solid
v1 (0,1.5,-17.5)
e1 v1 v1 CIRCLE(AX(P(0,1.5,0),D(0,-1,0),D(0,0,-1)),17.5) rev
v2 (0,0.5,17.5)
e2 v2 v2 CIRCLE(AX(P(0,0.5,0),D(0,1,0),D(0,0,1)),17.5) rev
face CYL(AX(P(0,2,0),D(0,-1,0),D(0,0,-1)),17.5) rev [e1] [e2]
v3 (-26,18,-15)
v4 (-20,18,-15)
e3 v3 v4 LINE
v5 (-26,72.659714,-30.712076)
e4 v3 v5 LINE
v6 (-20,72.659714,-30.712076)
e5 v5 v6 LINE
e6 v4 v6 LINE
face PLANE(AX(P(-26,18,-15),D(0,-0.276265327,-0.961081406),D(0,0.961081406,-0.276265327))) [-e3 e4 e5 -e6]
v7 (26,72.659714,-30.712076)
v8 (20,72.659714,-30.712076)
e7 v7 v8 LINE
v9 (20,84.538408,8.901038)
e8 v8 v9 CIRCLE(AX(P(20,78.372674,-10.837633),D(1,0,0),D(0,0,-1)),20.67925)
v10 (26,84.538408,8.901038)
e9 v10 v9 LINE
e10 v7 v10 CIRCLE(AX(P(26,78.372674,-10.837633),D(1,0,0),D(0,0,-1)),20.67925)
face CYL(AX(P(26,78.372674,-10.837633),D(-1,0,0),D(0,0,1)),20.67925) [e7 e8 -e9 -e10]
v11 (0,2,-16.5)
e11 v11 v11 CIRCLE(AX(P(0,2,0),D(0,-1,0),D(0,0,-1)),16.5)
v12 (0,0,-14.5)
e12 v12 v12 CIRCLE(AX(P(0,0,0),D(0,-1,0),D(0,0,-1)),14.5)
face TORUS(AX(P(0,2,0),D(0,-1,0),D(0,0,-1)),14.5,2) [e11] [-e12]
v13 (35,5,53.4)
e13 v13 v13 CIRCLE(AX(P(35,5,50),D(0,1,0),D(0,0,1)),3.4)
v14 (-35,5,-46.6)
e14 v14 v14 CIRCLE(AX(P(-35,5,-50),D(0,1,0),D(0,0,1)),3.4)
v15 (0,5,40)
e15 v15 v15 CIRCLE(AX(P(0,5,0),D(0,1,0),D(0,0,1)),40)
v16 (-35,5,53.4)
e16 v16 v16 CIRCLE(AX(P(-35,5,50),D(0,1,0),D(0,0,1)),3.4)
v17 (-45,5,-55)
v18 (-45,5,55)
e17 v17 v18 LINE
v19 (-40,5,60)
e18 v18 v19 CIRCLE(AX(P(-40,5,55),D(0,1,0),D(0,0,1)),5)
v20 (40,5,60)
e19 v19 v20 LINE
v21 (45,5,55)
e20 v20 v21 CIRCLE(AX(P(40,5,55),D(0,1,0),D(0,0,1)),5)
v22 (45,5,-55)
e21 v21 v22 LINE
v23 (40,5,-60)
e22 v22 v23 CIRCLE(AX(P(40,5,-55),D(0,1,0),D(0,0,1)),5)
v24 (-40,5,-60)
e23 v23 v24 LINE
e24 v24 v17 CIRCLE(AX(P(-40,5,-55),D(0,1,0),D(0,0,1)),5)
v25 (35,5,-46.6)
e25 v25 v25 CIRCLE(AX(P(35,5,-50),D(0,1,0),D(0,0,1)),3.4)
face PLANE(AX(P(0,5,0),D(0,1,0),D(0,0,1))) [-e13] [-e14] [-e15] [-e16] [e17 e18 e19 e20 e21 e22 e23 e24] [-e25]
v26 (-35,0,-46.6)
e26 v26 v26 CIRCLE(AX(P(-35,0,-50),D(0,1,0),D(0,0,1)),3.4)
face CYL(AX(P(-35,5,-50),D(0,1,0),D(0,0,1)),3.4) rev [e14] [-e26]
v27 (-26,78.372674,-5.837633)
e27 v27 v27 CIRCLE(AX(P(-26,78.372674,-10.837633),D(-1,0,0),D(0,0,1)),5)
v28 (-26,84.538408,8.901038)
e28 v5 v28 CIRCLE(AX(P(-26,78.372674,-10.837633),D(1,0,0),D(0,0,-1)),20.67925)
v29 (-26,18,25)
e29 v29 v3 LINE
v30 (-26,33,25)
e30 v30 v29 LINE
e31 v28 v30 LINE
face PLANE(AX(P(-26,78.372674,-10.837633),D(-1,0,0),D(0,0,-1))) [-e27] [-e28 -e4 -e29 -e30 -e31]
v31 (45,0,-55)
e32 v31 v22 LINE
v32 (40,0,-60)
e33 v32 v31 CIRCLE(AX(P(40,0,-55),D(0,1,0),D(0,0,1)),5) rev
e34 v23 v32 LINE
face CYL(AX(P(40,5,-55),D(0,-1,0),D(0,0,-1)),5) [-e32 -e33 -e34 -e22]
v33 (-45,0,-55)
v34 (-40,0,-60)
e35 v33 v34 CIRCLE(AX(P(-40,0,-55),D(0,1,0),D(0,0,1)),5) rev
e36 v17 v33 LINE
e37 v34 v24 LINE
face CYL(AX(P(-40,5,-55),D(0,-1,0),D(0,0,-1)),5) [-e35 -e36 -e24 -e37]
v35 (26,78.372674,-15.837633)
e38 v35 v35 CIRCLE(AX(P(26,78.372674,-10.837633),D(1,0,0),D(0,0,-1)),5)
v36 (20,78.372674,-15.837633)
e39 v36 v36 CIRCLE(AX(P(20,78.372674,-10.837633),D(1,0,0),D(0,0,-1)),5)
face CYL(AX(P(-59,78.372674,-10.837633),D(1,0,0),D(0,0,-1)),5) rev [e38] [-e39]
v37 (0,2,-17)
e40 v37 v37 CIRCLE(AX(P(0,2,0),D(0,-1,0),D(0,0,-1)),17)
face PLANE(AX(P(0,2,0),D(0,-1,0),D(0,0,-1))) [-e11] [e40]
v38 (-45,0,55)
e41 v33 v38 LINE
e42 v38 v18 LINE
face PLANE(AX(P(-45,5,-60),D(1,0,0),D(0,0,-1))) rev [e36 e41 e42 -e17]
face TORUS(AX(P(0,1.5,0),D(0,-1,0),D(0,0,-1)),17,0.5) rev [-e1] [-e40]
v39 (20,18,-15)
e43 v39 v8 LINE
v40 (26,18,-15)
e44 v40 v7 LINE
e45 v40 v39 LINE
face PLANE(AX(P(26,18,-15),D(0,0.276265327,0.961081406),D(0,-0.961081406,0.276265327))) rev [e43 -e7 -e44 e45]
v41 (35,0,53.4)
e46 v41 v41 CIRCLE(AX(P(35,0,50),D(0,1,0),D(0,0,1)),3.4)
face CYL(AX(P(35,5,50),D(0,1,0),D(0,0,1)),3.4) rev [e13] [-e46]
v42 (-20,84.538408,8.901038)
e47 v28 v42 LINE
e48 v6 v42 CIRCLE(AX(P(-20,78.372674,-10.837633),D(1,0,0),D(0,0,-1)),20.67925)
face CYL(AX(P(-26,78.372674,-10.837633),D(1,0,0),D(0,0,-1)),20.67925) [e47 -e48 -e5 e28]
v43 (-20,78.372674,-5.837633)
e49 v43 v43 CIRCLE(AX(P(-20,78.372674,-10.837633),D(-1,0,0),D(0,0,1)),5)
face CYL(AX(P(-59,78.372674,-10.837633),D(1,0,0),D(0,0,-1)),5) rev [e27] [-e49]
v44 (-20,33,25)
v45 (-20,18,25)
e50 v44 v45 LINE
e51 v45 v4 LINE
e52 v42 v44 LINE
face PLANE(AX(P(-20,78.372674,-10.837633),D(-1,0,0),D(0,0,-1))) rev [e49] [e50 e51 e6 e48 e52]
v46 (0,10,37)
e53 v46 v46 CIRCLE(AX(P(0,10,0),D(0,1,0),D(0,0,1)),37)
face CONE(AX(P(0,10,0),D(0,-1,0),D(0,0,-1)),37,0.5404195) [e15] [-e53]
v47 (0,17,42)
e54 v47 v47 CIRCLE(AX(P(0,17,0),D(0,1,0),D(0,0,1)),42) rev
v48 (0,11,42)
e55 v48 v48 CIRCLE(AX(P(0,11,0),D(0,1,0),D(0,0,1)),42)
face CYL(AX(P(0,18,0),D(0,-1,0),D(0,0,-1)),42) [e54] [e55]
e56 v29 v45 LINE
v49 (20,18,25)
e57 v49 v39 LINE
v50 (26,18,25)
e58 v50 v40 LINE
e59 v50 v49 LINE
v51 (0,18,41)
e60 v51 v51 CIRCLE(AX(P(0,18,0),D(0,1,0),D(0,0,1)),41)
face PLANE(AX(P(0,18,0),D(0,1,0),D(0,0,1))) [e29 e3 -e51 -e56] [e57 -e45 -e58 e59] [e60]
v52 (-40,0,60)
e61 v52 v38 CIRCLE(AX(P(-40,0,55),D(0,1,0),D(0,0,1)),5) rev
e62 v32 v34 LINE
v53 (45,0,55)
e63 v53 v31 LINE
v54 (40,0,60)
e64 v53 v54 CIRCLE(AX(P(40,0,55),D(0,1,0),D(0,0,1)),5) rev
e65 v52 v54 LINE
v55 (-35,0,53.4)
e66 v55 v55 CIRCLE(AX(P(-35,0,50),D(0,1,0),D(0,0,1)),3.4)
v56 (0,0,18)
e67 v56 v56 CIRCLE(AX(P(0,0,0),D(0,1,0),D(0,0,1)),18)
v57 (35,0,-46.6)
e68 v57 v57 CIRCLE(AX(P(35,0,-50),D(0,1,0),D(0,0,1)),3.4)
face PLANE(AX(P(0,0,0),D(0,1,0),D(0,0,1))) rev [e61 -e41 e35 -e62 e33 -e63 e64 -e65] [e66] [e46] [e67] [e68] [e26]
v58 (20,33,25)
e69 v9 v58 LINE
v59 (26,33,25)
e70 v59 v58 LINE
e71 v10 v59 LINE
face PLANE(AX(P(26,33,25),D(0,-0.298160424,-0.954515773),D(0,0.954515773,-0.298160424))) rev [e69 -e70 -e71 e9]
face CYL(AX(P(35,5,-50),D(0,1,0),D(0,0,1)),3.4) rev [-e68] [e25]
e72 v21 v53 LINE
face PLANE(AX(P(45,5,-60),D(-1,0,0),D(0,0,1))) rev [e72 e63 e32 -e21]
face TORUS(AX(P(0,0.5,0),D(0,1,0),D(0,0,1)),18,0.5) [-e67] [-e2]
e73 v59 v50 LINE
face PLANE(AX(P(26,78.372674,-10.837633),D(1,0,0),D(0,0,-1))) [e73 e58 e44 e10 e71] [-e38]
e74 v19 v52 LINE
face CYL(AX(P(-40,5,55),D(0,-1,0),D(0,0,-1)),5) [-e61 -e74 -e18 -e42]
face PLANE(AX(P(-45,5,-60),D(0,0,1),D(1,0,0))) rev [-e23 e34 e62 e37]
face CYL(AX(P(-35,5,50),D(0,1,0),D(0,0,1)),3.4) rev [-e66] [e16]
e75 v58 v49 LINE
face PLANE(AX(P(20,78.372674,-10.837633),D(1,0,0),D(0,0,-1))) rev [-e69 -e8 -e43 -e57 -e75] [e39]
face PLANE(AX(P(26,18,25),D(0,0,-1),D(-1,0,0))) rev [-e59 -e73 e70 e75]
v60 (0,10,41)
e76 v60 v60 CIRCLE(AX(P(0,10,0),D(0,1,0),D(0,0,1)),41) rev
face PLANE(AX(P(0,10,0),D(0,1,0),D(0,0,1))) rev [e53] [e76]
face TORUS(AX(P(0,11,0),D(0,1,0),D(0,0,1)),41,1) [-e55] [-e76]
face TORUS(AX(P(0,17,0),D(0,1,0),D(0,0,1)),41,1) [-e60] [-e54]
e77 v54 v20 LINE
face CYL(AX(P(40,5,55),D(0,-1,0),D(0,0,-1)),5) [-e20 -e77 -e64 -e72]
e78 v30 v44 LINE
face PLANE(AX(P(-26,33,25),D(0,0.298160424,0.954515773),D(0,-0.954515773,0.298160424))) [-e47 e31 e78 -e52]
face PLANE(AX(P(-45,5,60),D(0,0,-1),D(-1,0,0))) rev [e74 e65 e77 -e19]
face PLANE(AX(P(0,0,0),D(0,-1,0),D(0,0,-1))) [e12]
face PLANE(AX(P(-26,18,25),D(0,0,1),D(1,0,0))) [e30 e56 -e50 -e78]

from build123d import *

# Parameters (mm, degrees)
SKETCH_1_W          = 90
SKETCH_1_H          = 120
EXTRUDE_1_DEPTH     = 5
FILLET_3_R          = 5
SKETCH_21_R         = 17.5
CUT_EXTRUDE_1_DEPTH = 2
FILLET_4_R          = 0.5
SKETCH_22_R         = 16.5
EXTRUDE_2_DEPTH     = 2
FILLET_5_R          = 2
FILLET_6_R          = 0.5
SKETCH_27_R         = 42
EXTRUDE_4_DEPTH     = 8
EXTRUDE_5_DEPTH     = 6
SKETCH_31_R         = 5
CUT_EXTRUDE_2_DEPTH = 85
FILLET_7_R          = 1
FILLET_8_R          = 1


with BuildPart() as part:
    # 草图1 → 凸台-拉伸1 (new body)
    with BuildSketch(Plane(origin=(0, 0, 0), x_dir=(1, 0, 0), z_dir=(0, 1, 0))):
        Rectangle(SKETCH_1_W, SKETCH_1_H)
    extrude(amount=EXTRUDE_1_DEPTH)

    # 圆角3
    fillet_3_edges = [part.edges().sort_by_distance(p)[0] for p in [
        (45, 2.5, 60),
        (-45, 2.5, 60),
        (-45, 2.5, -60),
        (45, 2.5, -60),
    ]]
    fillet(fillet_3_edges, radius=FILLET_3_R)

    # 草图17 → M8 螺纹孔1 (revolve, cut)
    with BuildSketch(Plane(origin=(-35, 5, -50), x_dir=(0, 0, 1), z_dir=(1, 0, 0))):
        Polygon((0, 0), (0, 21.792926105), (3.4, 19.75), (3.4, 0), align=None)
    hole_wizard_m8_1 = revolve(axis=Axis((-35, 11.35, -50), (0, -1, 0)), mode=Mode.SUBTRACT)

    # 镜向4: M8 螺纹孔1 across plane
    add(hole_wizard_m8_1.mirror(Plane(origin=(0, 0, 0), x_dir=(0, 0, 1), z_dir=(1, 0, 0))), mode=Mode.SUBTRACT)

    # 镜向5: M8 螺纹孔1 across plane
    add(hole_wizard_m8_1.mirror(Plane.XY), mode=Mode.SUBTRACT)

    # 镜向5 copy 1 sketch → 镜向5 copy 1 (revolve, cut)
    with BuildSketch(Plane(origin=(35, 5, 50), x_dir=(0, 0, -1), z_dir=(-1, 0, 0))):
        Polygon((0, 0), (0, 21.792926105), (3.4, 19.75), (3.4, 0), align=None)
    revolve(axis=Axis((35, 11.35, 50), (0, -1, 0)), mode=Mode.SUBTRACT)

    # 草图21 → 切除-拉伸1 (cut)
    with BuildSketch(Plane.XZ):
        with Locations(Location((0, 0, 0), (0, 0, 270))):
            Circle(SKETCH_21_R)
    extrude(amount=-CUT_EXTRUDE_1_DEPTH, mode=Mode.SUBTRACT)

    # 圆角4
    fillet_4_edges = [part.edges().sort_by_distance(p)[0] for p in [
        (0, 0, 17.5),
    ]]
    fillet(fillet_4_edges, radius=FILLET_4_R)

    # 草图22 → 凸台-拉伸2 (add)
    with BuildSketch(Plane.XZ.offset(-2)):
        with Locations(Location((0, 0, 0), (0, 0, 270))):
            Circle(SKETCH_22_R)
    extrude(amount=EXTRUDE_2_DEPTH)

    # 圆角5
    fillet_5_edges = [part.edges().sort_by_distance(p)[0] for p in [
        (0, 0, 16.5),
    ]]
    fillet(fillet_5_edges, radius=FILLET_5_R - 0.0001)  # a hair under: the kernel refuses the full size

    # 圆角6
    fillet_6_edges = [part.edges().sort_by_distance(p)[0] for p in [
        (0, 2, 17.5),
    ]]
    fillet(fillet_6_edges, radius=FILLET_6_R)

    # 草图26 → 旋转1 (revolve)
    with BuildSketch(Plane(origin=(0, 0, 0), x_dir=(0, 0, -1), z_dir=(1, 0, 0))):
        Polygon((0, 5), (-40, 5), (-37, 10), (0, 10), align=None)
    revolve(axis=Axis((0, 10, 0), (0, -1, 0)))

    # 草图27 → 凸台-拉伸4 (add)
    with BuildSketch(Plane(origin=(0, 10, 0), x_dir=(1, 0, 0), z_dir=(0, 1, 0))):
        with Locations(Location((0, 0, 0), (0, 0, 270))):
            Circle(SKETCH_27_R)
    extrude(amount=EXTRUDE_4_DEPTH)

    # 草图30 → 凸台-拉伸5 (add)
    with BuildSketch(Plane(origin=(20, 0, 0), x_dir=(0, 0, -1), z_dir=(1, 0, 0))):
        with BuildLine():
            Line((0, 18), (15, 18))
            Line((15, 18), (30.712075667, 72.659714105))
            ThreePointArc((30.712075667, 72.659714105), (16.777367703, 98.180524284), (-8.901037595, 84.538407896))
            Line((-8.901037595, 84.538407896), (-25, 33))
            Line((-25, 33), (-25, 18))
            Line((-25, 18), (0, 18))
        make_face()
    extrude_5 = extrude(amount=EXTRUDE_5_DEPTH)

    # 镜向6: 凸台-拉伸5 across plane
    add(extrude_5.mirror(Plane(origin=(0, 0, 0), x_dir=(0, 0, 1), z_dir=(1, 0, 0))))

    # 草图31 → 切除-拉伸2 (cut)
    with BuildSketch(Plane(origin=(26, 0, 0), x_dir=(0, 0, -1), z_dir=(1, 0, 0))):
        with Locations(Location((10.837632854, 78.372673904, 0), (0, 0, 180))):
            Circle(SKETCH_31_R)
    extrude(amount=-CUT_EXTRUDE_2_DEPTH, mode=Mode.SUBTRACT)

    # 圆角7
    fillet_7_edges = [part.edges().sort_by_distance(p)[0] for p in [
        (0, 10, -42),
    ]]
    fillet(fillet_7_edges, radius=FILLET_7_R)

    # 圆角8
    fillet_8_edges = [part.edges().sort_by_distance(p)[0] for p in [
        (0, 18, -42),
    ]]
    fillet(fillet_8_edges, radius=FILLET_8_R)


solid = part.part
